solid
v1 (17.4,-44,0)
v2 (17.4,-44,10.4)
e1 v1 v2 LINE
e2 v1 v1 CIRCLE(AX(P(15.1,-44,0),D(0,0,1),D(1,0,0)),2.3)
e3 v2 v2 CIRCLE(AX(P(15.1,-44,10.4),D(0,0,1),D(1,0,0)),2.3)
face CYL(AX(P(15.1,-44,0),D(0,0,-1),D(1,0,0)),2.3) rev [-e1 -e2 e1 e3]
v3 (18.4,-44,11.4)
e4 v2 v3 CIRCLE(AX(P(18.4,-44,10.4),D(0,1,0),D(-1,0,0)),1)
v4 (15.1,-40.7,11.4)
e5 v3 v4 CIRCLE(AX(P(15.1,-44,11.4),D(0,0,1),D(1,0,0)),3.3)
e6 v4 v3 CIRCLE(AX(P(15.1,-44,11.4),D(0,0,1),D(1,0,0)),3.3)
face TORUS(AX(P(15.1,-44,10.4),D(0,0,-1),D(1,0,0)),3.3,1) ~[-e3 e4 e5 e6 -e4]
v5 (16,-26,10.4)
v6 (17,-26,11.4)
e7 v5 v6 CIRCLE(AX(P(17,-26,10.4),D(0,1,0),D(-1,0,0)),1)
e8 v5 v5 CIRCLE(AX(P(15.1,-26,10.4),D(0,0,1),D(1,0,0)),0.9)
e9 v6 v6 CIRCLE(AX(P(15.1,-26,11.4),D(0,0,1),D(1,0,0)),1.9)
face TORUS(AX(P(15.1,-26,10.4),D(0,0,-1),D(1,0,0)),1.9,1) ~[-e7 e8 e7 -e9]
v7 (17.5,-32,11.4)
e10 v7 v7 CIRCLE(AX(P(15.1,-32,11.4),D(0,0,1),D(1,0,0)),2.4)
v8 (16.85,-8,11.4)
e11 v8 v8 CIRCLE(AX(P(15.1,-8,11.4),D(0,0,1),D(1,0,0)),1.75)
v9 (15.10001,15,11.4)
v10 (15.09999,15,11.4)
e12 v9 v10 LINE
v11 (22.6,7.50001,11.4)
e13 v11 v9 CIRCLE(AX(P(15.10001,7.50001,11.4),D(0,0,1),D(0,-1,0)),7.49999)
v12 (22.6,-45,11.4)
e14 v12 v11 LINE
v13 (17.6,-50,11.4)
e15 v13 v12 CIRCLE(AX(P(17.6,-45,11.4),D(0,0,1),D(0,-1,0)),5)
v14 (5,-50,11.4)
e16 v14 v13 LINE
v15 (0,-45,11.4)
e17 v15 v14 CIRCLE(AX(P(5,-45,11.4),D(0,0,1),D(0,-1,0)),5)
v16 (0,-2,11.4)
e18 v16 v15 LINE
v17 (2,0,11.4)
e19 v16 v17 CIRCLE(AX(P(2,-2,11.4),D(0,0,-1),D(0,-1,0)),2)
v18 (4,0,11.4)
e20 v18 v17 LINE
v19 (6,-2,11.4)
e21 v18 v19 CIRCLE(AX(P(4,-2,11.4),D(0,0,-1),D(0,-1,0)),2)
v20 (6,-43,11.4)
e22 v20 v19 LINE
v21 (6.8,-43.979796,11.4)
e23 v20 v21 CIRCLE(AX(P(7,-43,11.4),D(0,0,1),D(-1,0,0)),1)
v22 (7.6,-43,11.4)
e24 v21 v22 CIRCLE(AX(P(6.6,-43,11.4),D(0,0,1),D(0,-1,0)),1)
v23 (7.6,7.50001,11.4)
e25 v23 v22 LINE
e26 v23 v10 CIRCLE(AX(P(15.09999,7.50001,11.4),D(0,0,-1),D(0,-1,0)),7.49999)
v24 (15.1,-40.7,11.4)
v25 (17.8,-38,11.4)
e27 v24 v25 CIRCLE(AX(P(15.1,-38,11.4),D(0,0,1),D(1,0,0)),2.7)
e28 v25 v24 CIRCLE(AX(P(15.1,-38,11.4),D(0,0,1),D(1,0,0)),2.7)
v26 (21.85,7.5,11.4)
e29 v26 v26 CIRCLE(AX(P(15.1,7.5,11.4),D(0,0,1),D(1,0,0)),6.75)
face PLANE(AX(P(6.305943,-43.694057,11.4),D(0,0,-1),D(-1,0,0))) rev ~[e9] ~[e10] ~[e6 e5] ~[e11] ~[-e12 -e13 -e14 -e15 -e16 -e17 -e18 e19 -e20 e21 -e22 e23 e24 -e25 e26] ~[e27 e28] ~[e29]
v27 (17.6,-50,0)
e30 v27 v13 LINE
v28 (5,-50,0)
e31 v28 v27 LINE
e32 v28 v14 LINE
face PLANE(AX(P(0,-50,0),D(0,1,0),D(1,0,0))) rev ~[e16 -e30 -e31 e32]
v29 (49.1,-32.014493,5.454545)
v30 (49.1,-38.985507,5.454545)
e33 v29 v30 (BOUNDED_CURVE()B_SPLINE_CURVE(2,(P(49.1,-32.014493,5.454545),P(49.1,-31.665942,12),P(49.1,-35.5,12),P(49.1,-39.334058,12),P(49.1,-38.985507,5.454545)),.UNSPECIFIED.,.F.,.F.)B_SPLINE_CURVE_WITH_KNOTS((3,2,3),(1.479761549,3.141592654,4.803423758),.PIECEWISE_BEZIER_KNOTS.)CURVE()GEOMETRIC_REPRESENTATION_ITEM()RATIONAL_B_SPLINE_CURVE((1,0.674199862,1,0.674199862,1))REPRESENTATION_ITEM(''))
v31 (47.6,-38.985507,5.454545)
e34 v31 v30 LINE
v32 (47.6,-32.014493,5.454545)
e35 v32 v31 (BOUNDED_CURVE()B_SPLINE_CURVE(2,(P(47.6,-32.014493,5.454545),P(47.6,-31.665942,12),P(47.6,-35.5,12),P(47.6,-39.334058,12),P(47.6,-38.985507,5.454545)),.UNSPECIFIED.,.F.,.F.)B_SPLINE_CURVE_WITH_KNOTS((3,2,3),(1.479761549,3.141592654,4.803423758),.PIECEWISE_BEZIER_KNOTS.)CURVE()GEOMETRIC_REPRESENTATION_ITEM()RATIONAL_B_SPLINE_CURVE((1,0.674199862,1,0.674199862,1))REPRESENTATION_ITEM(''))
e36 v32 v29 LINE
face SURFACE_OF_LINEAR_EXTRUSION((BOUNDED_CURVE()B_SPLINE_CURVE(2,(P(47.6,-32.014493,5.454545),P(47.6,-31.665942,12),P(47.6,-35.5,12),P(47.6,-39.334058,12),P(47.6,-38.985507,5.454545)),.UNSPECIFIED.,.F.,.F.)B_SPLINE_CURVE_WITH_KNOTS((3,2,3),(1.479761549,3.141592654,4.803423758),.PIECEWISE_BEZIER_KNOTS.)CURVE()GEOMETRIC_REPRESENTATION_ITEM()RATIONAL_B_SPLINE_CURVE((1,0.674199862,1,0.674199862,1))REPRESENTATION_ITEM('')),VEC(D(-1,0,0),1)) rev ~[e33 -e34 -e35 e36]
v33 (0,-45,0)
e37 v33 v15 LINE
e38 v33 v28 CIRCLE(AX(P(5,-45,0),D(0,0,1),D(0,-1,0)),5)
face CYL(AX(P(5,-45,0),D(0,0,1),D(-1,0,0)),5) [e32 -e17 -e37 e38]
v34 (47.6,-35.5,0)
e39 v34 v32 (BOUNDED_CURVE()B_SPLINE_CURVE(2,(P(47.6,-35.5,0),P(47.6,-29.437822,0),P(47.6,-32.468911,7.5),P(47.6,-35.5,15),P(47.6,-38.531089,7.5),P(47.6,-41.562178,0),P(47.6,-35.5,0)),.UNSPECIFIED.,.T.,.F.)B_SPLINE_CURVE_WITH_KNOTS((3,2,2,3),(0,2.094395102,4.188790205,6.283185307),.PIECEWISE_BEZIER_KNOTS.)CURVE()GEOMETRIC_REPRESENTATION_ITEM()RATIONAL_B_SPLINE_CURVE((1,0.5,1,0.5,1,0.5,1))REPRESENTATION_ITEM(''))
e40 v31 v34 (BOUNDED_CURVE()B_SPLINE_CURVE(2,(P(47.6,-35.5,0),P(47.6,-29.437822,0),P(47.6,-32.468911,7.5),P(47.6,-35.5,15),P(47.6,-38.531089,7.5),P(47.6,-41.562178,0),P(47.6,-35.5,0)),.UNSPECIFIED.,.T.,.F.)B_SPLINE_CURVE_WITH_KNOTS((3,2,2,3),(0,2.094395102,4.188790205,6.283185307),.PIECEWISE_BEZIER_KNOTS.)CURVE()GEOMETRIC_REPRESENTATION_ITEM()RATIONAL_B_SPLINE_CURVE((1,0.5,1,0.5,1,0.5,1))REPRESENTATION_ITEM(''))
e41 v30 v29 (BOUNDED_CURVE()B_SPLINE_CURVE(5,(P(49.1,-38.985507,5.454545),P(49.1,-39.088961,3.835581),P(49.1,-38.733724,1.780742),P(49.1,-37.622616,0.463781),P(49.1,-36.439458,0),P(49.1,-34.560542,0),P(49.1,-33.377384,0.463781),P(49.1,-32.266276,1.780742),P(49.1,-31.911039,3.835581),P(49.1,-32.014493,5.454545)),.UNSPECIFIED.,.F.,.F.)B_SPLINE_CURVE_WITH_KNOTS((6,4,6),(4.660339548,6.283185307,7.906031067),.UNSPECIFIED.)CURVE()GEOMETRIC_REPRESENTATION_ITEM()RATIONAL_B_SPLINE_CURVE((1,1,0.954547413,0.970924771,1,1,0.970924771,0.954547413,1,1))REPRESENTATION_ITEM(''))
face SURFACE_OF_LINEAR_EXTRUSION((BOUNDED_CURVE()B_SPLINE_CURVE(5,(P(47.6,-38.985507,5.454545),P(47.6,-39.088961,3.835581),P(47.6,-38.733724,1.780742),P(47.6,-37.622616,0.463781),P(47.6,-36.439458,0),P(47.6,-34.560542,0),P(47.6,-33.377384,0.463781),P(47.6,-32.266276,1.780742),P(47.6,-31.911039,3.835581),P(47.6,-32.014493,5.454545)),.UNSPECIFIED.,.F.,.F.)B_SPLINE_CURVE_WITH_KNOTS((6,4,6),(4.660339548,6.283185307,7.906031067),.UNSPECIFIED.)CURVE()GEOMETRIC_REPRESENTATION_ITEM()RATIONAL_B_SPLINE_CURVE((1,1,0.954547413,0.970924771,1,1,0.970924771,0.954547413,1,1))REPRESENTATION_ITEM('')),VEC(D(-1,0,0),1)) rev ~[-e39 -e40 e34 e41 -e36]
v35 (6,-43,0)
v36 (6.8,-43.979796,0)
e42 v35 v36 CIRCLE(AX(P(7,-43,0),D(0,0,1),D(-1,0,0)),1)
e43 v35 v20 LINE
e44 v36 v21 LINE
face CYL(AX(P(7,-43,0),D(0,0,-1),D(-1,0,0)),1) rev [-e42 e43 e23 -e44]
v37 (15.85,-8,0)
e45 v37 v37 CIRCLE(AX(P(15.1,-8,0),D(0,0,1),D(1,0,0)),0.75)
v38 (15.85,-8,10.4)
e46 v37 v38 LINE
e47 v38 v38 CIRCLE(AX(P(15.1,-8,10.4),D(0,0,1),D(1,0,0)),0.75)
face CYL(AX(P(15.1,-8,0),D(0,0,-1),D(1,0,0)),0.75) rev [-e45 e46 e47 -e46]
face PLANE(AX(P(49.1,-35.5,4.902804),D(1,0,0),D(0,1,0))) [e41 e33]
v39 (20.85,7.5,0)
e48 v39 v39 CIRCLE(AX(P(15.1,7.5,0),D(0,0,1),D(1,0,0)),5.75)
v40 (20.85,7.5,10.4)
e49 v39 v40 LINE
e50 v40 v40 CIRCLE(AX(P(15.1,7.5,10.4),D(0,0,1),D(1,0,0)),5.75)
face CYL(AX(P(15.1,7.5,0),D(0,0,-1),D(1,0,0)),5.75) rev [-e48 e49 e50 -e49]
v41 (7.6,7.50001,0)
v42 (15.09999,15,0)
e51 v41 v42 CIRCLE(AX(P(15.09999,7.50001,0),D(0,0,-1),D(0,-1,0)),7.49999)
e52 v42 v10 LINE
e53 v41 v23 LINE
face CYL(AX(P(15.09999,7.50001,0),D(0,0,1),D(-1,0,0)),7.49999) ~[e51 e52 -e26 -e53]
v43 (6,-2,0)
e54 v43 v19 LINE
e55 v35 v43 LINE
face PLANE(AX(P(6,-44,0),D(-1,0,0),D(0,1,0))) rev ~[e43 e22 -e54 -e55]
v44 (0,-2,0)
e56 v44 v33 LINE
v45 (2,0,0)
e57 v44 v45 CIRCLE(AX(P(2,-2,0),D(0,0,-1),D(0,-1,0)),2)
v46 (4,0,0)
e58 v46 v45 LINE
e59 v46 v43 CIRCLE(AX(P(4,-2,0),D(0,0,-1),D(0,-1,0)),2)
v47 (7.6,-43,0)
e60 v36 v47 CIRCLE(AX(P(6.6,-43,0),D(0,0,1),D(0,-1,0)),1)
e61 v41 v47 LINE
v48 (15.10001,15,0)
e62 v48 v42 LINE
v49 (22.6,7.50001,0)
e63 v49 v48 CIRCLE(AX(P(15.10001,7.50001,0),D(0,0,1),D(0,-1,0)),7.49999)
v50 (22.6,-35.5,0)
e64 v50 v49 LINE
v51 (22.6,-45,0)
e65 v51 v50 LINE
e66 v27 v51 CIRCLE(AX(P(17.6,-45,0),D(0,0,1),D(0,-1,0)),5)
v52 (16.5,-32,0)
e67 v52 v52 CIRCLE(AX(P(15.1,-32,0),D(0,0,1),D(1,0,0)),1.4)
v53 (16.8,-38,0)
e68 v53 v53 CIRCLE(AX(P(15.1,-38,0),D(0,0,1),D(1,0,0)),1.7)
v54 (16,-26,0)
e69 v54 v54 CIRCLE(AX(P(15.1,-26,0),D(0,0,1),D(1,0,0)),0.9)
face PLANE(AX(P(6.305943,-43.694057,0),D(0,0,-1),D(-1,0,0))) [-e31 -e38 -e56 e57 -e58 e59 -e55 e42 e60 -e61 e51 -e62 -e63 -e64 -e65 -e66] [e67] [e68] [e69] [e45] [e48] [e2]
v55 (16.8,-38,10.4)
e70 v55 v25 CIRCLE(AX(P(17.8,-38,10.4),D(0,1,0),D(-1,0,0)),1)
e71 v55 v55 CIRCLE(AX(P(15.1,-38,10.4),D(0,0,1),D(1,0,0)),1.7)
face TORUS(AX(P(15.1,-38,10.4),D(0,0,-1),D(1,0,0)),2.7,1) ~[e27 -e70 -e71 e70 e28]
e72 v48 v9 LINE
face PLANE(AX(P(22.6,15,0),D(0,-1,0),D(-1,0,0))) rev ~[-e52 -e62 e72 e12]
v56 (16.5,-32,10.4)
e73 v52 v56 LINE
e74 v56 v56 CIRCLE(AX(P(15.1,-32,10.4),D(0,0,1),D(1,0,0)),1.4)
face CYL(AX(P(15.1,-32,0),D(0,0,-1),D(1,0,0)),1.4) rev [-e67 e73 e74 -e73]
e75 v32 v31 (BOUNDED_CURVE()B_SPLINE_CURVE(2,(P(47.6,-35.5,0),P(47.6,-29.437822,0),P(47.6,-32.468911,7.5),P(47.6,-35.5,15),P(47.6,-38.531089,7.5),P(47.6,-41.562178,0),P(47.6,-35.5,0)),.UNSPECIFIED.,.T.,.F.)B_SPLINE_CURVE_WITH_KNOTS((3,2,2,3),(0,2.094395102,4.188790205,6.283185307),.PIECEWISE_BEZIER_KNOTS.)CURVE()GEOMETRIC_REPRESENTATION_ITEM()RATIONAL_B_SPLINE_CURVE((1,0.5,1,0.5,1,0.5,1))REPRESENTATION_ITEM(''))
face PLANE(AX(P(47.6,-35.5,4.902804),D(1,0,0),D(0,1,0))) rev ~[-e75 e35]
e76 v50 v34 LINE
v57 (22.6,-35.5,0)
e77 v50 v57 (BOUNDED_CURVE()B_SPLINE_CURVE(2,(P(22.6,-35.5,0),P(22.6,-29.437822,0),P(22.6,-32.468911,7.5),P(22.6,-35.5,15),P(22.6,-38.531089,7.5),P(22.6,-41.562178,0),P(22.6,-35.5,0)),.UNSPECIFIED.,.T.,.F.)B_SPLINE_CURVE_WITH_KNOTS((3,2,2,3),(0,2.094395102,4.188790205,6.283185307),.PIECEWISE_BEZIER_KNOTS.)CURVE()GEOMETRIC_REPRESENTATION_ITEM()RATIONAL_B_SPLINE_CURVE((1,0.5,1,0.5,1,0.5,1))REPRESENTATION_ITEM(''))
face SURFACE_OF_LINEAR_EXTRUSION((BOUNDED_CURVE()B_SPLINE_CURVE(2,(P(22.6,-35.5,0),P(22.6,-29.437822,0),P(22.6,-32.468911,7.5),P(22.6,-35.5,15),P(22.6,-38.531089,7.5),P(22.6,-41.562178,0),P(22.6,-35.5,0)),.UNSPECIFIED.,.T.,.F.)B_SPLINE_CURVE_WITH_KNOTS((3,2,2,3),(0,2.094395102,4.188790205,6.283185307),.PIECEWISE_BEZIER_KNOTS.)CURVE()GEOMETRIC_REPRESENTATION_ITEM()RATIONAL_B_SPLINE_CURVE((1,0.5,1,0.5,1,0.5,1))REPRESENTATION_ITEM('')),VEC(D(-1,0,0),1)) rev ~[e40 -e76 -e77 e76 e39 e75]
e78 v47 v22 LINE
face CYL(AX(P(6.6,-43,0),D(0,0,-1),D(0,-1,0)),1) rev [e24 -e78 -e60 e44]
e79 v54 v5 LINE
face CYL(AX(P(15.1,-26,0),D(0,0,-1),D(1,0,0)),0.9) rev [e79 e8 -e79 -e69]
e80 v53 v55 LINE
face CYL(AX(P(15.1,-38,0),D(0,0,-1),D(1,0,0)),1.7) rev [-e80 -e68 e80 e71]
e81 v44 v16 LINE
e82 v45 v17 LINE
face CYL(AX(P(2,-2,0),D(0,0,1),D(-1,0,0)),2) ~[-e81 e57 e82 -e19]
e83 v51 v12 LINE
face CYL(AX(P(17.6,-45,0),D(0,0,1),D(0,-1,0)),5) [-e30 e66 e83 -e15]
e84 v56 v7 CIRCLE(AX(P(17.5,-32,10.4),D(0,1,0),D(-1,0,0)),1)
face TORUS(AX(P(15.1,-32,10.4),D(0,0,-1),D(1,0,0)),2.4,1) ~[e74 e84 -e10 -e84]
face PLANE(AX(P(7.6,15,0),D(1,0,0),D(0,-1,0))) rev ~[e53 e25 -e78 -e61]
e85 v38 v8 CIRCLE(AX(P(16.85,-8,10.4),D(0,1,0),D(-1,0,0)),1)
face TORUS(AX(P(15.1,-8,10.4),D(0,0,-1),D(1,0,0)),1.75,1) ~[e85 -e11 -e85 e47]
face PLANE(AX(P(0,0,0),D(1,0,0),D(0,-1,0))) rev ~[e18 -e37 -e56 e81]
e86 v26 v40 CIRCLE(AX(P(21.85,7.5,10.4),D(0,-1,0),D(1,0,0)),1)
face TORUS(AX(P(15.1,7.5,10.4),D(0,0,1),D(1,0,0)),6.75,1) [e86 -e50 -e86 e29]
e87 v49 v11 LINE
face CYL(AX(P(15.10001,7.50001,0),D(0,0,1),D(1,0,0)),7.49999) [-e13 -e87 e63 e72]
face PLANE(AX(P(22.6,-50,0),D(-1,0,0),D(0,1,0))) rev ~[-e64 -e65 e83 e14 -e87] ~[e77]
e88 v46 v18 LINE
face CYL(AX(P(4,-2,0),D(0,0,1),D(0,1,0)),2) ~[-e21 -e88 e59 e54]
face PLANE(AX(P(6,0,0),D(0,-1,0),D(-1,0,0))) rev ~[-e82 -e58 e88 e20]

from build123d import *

# Parameters (mm, degrees)
F0_W        = 1.6
F0_H        = 6
F0_R        = 2.3
F0_R_2      = 1.7
F0_R_3      = 1.4
F0_R_4      = 0.9
F0_R_5      = 0.75
F0_R_6      = 5.75
F1_DEPTH    = 11.4
F2_R        = 5
F3_R        = 7.49999
F4_R        = 2
F5_T1_DEPTH = 11.4
F6_R        = 1
F8_DEPTH    = 25
F10_DEPTH   = 1.5


# Not quite as in the source:
# - a fillet or chamfer that OpenCascade refuses, or shapes differently, is made with other operations: its cross-section is extruded or revolved along the edge and cut away or added
# - a fillet or chamfer is up to 0.001 mm smaller than in the source, because OpenCascade refuses the exact size


with BuildPart() as f1:
    # F0 (on Top) → F1 (new body)
    with BuildSketch(Plane.XY):
        Polygon((6, 0), (0, 0), (0, -50), (6, -50), (6, -44), align=None)
        with Locations((6.8, -47)):
            Rectangle(F0_W, F0_H)
        Polygon((7.6, 15), (7.6, -44), (7.6, -50), (22.6, -50), (22.6, 15), align=None)
        with Locations((15.1, -44)):
            Circle(F0_R, mode=Mode.SUBTRACT)
        with Locations((15.1, -38)):
            Circle(F0_R_2, mode=Mode.SUBTRACT)
        with Locations((15.1, -32)):
            Circle(F0_R_3, mode=Mode.SUBTRACT)
        with Locations((15.1, -26)):
            Circle(F0_R_4, mode=Mode.SUBTRACT)
        with Locations((15.1, -8)):
            Circle(F0_R_5, mode=Mode.SUBTRACT)
        with Locations((15.1, 7.5)):
            Circle(F0_R_6, mode=Mode.SUBTRACT)
    extrude(amount=F1_DEPTH)

    # F2
    f2_edges = [f1.edges().sort_by_distance(p)[0] for p in [
        (0, -50, 5.7),
        (22.6, -50, 5.7),
    ]]
    fillet(f2_edges, radius=F2_R)

    # F3 (radius 7.5 in the source; OpenCascade refuses exactly that, so slightly less here)
    f3_edges = [f1.edges().sort_by_distance(p)[0] for p in [
        (22.6, 15, 5.7),
        (7.6, 15, 5.7),
    ]]
    fillet(f3_edges, radius=F3_R)

    # F4
    f4_edges = [f1.edges().sort_by_distance(p)[0] for p in [
        (0, 0, 5.7),
        (6, 0, 5.7),
    ]]
    fillet(f4_edges, radius=F4_R)

    # F5: fillet of radius 1 on 7 edges, made by hand

    # F5_s2 → F5_t1 (join)
    with BuildSketch(Plane.XY):
        with BuildLine():
            ThreePointArc((6, -43), (6.2928932188, -43.7071067812), (7, -44))
            Line((7, -44), (6, -44))
            Line((6, -44), (6, -43))
        make_face()
        with BuildLine():
            ThreePointArc((6.6, -44), (7.3071067812, -43.7071067812), (7.6, -43))
            Line((7.6, -43), (7.6, -44))
            Line((7.6, -44), (6.6, -44))
        make_face()
    extrude(amount=F5_T1_DEPTH)

    # F5_s3 → F5_t4 (revolve, cut)
    with BuildSketch(Plane.XZ.offset(44)):
        with BuildLine():
            ThreePointArc((17.4, 10.4), (17.6928932188, 11.1071067812), (18.4, 11.4))
            Line((18.4, 11.4), (17.4, 11.4))
            Line((17.4, 11.4), (17.4, 10.4))
        make_face()
    revolve(axis=Axis((15.1, -44, 11.4), (0, 0, 1)), mode=Mode.SUBTRACT)

    # F5_s5 → F5_t6 (revolve, cut)
    with BuildSketch(Plane.XZ.offset(38)):
        with BuildLine():
            ThreePointArc((16.8, 10.4), (17.0928932188, 11.1071067812), (17.8, 11.4))
            Line((17.8, 11.4), (16.8, 11.4))
            Line((16.8, 11.4), (16.8, 10.4))
        make_face()
    revolve(axis=Axis((15.1, -38, 11.4), (0, 0, 1)), mode=Mode.SUBTRACT)

    # F5_s7 → F5_t8 (revolve, cut)
    with BuildSketch(Plane.XZ.offset(32)):
        with BuildLine():
            ThreePointArc((16.5, 10.4), (16.7928932188, 11.1071067812), (17.5, 11.4))
            Line((17.5, 11.4), (16.5, 11.4))
            Line((16.5, 11.4), (16.5, 10.4))
        make_face()
    revolve(axis=Axis((15.1, -32, 11.4), (0, 0, 1)), mode=Mode.SUBTRACT)

    # F5_s9 → F5_t10 (revolve, cut)
    with BuildSketch(Plane.XZ.offset(26)):
        with BuildLine():
            ThreePointArc((16, 10.4), (16.2928932188, 11.1071067812), (17, 11.4))
            Line((17, 11.4), (16, 11.4))
            Line((16, 11.4), (16, 10.4))
        make_face()
    revolve(axis=Axis((15.1, -26, 11.4), (0, 0, 1)), mode=Mode.SUBTRACT)

    # F5_s11 → F5_t12 (revolve, cut)
    with BuildSketch(Plane.XZ.offset(8)):
        with BuildLine():
            ThreePointArc((15.85, 10.4), (16.1428932188, 11.1071067812), (16.85, 11.4))
            Line((16.85, 11.4), (15.85, 11.4))
            Line((15.85, 11.4), (15.85, 10.4))
        make_face()
    revolve(axis=Axis((15.1, -8, 11.4), (0, 0, 1)), mode=Mode.SUBTRACT)

    # F6
    f6_edges = [f1.edges().sort_by_distance(p)[0] for p in [
        (9.35, 7.5, 11.4),
    ]]
    fillet(f6_edges, radius=F6_R)

    # F7 (on face) → F8 (join)
    with BuildSketch(Plane.YZ.offset(22.6)):
        with BuildLine():
            add(Edge.make_bspline(
                [(-35.5, 0), (-29.4378221735, 0), (-32.4689110868, 7.5), (-35.5, 15), (-38.5310889132, 7.5), (-41.5621778265, 0), (-35.5, 0)],
                knots=[0, 0, 0, 2.0943951024, 2.0943951024, 4.1887902048, 4.1887902048, 6.2831853072, 6.2831853072, 6.2831853072], degree=2, weights=[1, 0.5, 1, 0.5, 1, 0.5, 1]))
        make_face()
    extrude(amount=F8_DEPTH)

    # F9 (on face) → F10 (join)
    with BuildSketch(Plane.YZ.offset(47.6)):
        with BuildLine():
            add(Edge.make_bspline(
                [(-38.9855071841, 5.4545454545), (-38.6950482521, 0), (-35.5, 0)],
                knots=[4.8034237584, 4.8034237584, 4.8034237584, 6.2831853072, 6.2831853072, 6.2831853072], degree=2, weights=[1, 0.7385489459, 1]))
            add(Edge.make_bspline(
                [(-35.5, 0), (-32.3049517479, 0), (-32.0144928159, 5.4545454545)],
                knots=[0, 0, 0, 1.4797615488, 1.4797615488, 1.4797615488], degree=2, weights=[1, 0.7385489459, 1]))
            add(Edge.make_bspline(
                [(-32.0144928159, 5.4545454545), (-32.0844033191, 6.548590015), (-32.4689110868, 7.5), (-35.5, 15), (-38.5310889132, 7.5), (-38.9155966809, 6.548590015), (-38.9855071841, 5.4545454545)],
                knots=[1.6228457594, 1.6228457594, 1.6228457594, 2.0943951024, 2.0943951024, 4.1887902048, 4.1887902048, 4.6603395478, 4.6603395478, 4.6603395478], degree=2, weights=[0.8255434974, 0.8874258867, 1, 0.5, 1, 0.8874258867, 0.8255434974]))
        make_face()
        with BuildLine():
            add(Edge.make_bspline(
                [(-38.9855071841, 5.4545454545), (-39.3340579025, 0), (-35.5, 0)],
                knots=[4.6603395478, 4.6603395478, 4.6603395478, 6.2831853072, 6.2831853072, 6.2831853072], degree=2, weights=[0.8255434974, 0.6125741133, 1]))
            add(Edge.make_bspline(
                [(-38.9855071841, 5.4545454545), (-38.6950482521, 0), (-35.5, 0)],
                knots=[4.8034237584, 4.8034237584, 4.8034237584, 6.2831853072, 6.2831853072, 6.2831853072], degree=2, weights=[1, 0.7385489459, 1]))
        make_face()
        with BuildLine():
            add(Edge.make_bspline(
                [(-35.5, 0), (-32.3049517479, 0), (-32.0144928159, 5.4545454545)],
                knots=[0, 0, 0, 1.4797615488, 1.4797615488, 1.4797615488], degree=2, weights=[1, 0.7385489459, 1]))
            add(Edge.make_bspline(
                [(-35.5, 0), (-31.6659420975, 0), (-32.0144928159, 5.4545454545)],
                knots=[0, 0, 0, 1.6228457594, 1.6228457594, 1.6228457594], degree=2, weights=[1, 0.6125741133, 0.8255434974]))
        make_face()
        with BuildLine():
            add(Edge.make_bspline(
                [(-32.0144928159, 5.4545454545), (-32.0844033191, 6.548590015), (-32.4689110868, 7.5), (-35.5, 15), (-38.5310889132, 7.5), (-38.9155966809, 6.548590015), (-38.9855071841, 5.4545454545)],
                knots=[1.6228457594, 1.6228457594, 1.6228457594, 2.0943951024, 2.0943951024, 4.1887902048, 4.1887902048, 4.6603395478, 4.6603395478, 4.6603395478], degree=2, weights=[0.8255434974, 0.8874258867, 1, 0.5, 1, 0.8874258867, 0.8255434974]))
            add(Edge.make_bspline(
                [(-32.0144928159, 5.4545454545), (-31.6659420975, 12), (-35.5, 12), (-39.3340579025, 12), (-38.9855071841, 5.4545454545)],
                knots=[1.4797615488, 1.4797615488, 1.4797615488, 3.1415926536, 3.1415926536, 4.8034237584, 4.8034237584, 4.8034237584], degree=2, weights=[1, 0.6741998625, 1, 0.6741998625, 1]))
        make_face()
    extrude(amount=F10_DEPTH)


solid = f1.part
